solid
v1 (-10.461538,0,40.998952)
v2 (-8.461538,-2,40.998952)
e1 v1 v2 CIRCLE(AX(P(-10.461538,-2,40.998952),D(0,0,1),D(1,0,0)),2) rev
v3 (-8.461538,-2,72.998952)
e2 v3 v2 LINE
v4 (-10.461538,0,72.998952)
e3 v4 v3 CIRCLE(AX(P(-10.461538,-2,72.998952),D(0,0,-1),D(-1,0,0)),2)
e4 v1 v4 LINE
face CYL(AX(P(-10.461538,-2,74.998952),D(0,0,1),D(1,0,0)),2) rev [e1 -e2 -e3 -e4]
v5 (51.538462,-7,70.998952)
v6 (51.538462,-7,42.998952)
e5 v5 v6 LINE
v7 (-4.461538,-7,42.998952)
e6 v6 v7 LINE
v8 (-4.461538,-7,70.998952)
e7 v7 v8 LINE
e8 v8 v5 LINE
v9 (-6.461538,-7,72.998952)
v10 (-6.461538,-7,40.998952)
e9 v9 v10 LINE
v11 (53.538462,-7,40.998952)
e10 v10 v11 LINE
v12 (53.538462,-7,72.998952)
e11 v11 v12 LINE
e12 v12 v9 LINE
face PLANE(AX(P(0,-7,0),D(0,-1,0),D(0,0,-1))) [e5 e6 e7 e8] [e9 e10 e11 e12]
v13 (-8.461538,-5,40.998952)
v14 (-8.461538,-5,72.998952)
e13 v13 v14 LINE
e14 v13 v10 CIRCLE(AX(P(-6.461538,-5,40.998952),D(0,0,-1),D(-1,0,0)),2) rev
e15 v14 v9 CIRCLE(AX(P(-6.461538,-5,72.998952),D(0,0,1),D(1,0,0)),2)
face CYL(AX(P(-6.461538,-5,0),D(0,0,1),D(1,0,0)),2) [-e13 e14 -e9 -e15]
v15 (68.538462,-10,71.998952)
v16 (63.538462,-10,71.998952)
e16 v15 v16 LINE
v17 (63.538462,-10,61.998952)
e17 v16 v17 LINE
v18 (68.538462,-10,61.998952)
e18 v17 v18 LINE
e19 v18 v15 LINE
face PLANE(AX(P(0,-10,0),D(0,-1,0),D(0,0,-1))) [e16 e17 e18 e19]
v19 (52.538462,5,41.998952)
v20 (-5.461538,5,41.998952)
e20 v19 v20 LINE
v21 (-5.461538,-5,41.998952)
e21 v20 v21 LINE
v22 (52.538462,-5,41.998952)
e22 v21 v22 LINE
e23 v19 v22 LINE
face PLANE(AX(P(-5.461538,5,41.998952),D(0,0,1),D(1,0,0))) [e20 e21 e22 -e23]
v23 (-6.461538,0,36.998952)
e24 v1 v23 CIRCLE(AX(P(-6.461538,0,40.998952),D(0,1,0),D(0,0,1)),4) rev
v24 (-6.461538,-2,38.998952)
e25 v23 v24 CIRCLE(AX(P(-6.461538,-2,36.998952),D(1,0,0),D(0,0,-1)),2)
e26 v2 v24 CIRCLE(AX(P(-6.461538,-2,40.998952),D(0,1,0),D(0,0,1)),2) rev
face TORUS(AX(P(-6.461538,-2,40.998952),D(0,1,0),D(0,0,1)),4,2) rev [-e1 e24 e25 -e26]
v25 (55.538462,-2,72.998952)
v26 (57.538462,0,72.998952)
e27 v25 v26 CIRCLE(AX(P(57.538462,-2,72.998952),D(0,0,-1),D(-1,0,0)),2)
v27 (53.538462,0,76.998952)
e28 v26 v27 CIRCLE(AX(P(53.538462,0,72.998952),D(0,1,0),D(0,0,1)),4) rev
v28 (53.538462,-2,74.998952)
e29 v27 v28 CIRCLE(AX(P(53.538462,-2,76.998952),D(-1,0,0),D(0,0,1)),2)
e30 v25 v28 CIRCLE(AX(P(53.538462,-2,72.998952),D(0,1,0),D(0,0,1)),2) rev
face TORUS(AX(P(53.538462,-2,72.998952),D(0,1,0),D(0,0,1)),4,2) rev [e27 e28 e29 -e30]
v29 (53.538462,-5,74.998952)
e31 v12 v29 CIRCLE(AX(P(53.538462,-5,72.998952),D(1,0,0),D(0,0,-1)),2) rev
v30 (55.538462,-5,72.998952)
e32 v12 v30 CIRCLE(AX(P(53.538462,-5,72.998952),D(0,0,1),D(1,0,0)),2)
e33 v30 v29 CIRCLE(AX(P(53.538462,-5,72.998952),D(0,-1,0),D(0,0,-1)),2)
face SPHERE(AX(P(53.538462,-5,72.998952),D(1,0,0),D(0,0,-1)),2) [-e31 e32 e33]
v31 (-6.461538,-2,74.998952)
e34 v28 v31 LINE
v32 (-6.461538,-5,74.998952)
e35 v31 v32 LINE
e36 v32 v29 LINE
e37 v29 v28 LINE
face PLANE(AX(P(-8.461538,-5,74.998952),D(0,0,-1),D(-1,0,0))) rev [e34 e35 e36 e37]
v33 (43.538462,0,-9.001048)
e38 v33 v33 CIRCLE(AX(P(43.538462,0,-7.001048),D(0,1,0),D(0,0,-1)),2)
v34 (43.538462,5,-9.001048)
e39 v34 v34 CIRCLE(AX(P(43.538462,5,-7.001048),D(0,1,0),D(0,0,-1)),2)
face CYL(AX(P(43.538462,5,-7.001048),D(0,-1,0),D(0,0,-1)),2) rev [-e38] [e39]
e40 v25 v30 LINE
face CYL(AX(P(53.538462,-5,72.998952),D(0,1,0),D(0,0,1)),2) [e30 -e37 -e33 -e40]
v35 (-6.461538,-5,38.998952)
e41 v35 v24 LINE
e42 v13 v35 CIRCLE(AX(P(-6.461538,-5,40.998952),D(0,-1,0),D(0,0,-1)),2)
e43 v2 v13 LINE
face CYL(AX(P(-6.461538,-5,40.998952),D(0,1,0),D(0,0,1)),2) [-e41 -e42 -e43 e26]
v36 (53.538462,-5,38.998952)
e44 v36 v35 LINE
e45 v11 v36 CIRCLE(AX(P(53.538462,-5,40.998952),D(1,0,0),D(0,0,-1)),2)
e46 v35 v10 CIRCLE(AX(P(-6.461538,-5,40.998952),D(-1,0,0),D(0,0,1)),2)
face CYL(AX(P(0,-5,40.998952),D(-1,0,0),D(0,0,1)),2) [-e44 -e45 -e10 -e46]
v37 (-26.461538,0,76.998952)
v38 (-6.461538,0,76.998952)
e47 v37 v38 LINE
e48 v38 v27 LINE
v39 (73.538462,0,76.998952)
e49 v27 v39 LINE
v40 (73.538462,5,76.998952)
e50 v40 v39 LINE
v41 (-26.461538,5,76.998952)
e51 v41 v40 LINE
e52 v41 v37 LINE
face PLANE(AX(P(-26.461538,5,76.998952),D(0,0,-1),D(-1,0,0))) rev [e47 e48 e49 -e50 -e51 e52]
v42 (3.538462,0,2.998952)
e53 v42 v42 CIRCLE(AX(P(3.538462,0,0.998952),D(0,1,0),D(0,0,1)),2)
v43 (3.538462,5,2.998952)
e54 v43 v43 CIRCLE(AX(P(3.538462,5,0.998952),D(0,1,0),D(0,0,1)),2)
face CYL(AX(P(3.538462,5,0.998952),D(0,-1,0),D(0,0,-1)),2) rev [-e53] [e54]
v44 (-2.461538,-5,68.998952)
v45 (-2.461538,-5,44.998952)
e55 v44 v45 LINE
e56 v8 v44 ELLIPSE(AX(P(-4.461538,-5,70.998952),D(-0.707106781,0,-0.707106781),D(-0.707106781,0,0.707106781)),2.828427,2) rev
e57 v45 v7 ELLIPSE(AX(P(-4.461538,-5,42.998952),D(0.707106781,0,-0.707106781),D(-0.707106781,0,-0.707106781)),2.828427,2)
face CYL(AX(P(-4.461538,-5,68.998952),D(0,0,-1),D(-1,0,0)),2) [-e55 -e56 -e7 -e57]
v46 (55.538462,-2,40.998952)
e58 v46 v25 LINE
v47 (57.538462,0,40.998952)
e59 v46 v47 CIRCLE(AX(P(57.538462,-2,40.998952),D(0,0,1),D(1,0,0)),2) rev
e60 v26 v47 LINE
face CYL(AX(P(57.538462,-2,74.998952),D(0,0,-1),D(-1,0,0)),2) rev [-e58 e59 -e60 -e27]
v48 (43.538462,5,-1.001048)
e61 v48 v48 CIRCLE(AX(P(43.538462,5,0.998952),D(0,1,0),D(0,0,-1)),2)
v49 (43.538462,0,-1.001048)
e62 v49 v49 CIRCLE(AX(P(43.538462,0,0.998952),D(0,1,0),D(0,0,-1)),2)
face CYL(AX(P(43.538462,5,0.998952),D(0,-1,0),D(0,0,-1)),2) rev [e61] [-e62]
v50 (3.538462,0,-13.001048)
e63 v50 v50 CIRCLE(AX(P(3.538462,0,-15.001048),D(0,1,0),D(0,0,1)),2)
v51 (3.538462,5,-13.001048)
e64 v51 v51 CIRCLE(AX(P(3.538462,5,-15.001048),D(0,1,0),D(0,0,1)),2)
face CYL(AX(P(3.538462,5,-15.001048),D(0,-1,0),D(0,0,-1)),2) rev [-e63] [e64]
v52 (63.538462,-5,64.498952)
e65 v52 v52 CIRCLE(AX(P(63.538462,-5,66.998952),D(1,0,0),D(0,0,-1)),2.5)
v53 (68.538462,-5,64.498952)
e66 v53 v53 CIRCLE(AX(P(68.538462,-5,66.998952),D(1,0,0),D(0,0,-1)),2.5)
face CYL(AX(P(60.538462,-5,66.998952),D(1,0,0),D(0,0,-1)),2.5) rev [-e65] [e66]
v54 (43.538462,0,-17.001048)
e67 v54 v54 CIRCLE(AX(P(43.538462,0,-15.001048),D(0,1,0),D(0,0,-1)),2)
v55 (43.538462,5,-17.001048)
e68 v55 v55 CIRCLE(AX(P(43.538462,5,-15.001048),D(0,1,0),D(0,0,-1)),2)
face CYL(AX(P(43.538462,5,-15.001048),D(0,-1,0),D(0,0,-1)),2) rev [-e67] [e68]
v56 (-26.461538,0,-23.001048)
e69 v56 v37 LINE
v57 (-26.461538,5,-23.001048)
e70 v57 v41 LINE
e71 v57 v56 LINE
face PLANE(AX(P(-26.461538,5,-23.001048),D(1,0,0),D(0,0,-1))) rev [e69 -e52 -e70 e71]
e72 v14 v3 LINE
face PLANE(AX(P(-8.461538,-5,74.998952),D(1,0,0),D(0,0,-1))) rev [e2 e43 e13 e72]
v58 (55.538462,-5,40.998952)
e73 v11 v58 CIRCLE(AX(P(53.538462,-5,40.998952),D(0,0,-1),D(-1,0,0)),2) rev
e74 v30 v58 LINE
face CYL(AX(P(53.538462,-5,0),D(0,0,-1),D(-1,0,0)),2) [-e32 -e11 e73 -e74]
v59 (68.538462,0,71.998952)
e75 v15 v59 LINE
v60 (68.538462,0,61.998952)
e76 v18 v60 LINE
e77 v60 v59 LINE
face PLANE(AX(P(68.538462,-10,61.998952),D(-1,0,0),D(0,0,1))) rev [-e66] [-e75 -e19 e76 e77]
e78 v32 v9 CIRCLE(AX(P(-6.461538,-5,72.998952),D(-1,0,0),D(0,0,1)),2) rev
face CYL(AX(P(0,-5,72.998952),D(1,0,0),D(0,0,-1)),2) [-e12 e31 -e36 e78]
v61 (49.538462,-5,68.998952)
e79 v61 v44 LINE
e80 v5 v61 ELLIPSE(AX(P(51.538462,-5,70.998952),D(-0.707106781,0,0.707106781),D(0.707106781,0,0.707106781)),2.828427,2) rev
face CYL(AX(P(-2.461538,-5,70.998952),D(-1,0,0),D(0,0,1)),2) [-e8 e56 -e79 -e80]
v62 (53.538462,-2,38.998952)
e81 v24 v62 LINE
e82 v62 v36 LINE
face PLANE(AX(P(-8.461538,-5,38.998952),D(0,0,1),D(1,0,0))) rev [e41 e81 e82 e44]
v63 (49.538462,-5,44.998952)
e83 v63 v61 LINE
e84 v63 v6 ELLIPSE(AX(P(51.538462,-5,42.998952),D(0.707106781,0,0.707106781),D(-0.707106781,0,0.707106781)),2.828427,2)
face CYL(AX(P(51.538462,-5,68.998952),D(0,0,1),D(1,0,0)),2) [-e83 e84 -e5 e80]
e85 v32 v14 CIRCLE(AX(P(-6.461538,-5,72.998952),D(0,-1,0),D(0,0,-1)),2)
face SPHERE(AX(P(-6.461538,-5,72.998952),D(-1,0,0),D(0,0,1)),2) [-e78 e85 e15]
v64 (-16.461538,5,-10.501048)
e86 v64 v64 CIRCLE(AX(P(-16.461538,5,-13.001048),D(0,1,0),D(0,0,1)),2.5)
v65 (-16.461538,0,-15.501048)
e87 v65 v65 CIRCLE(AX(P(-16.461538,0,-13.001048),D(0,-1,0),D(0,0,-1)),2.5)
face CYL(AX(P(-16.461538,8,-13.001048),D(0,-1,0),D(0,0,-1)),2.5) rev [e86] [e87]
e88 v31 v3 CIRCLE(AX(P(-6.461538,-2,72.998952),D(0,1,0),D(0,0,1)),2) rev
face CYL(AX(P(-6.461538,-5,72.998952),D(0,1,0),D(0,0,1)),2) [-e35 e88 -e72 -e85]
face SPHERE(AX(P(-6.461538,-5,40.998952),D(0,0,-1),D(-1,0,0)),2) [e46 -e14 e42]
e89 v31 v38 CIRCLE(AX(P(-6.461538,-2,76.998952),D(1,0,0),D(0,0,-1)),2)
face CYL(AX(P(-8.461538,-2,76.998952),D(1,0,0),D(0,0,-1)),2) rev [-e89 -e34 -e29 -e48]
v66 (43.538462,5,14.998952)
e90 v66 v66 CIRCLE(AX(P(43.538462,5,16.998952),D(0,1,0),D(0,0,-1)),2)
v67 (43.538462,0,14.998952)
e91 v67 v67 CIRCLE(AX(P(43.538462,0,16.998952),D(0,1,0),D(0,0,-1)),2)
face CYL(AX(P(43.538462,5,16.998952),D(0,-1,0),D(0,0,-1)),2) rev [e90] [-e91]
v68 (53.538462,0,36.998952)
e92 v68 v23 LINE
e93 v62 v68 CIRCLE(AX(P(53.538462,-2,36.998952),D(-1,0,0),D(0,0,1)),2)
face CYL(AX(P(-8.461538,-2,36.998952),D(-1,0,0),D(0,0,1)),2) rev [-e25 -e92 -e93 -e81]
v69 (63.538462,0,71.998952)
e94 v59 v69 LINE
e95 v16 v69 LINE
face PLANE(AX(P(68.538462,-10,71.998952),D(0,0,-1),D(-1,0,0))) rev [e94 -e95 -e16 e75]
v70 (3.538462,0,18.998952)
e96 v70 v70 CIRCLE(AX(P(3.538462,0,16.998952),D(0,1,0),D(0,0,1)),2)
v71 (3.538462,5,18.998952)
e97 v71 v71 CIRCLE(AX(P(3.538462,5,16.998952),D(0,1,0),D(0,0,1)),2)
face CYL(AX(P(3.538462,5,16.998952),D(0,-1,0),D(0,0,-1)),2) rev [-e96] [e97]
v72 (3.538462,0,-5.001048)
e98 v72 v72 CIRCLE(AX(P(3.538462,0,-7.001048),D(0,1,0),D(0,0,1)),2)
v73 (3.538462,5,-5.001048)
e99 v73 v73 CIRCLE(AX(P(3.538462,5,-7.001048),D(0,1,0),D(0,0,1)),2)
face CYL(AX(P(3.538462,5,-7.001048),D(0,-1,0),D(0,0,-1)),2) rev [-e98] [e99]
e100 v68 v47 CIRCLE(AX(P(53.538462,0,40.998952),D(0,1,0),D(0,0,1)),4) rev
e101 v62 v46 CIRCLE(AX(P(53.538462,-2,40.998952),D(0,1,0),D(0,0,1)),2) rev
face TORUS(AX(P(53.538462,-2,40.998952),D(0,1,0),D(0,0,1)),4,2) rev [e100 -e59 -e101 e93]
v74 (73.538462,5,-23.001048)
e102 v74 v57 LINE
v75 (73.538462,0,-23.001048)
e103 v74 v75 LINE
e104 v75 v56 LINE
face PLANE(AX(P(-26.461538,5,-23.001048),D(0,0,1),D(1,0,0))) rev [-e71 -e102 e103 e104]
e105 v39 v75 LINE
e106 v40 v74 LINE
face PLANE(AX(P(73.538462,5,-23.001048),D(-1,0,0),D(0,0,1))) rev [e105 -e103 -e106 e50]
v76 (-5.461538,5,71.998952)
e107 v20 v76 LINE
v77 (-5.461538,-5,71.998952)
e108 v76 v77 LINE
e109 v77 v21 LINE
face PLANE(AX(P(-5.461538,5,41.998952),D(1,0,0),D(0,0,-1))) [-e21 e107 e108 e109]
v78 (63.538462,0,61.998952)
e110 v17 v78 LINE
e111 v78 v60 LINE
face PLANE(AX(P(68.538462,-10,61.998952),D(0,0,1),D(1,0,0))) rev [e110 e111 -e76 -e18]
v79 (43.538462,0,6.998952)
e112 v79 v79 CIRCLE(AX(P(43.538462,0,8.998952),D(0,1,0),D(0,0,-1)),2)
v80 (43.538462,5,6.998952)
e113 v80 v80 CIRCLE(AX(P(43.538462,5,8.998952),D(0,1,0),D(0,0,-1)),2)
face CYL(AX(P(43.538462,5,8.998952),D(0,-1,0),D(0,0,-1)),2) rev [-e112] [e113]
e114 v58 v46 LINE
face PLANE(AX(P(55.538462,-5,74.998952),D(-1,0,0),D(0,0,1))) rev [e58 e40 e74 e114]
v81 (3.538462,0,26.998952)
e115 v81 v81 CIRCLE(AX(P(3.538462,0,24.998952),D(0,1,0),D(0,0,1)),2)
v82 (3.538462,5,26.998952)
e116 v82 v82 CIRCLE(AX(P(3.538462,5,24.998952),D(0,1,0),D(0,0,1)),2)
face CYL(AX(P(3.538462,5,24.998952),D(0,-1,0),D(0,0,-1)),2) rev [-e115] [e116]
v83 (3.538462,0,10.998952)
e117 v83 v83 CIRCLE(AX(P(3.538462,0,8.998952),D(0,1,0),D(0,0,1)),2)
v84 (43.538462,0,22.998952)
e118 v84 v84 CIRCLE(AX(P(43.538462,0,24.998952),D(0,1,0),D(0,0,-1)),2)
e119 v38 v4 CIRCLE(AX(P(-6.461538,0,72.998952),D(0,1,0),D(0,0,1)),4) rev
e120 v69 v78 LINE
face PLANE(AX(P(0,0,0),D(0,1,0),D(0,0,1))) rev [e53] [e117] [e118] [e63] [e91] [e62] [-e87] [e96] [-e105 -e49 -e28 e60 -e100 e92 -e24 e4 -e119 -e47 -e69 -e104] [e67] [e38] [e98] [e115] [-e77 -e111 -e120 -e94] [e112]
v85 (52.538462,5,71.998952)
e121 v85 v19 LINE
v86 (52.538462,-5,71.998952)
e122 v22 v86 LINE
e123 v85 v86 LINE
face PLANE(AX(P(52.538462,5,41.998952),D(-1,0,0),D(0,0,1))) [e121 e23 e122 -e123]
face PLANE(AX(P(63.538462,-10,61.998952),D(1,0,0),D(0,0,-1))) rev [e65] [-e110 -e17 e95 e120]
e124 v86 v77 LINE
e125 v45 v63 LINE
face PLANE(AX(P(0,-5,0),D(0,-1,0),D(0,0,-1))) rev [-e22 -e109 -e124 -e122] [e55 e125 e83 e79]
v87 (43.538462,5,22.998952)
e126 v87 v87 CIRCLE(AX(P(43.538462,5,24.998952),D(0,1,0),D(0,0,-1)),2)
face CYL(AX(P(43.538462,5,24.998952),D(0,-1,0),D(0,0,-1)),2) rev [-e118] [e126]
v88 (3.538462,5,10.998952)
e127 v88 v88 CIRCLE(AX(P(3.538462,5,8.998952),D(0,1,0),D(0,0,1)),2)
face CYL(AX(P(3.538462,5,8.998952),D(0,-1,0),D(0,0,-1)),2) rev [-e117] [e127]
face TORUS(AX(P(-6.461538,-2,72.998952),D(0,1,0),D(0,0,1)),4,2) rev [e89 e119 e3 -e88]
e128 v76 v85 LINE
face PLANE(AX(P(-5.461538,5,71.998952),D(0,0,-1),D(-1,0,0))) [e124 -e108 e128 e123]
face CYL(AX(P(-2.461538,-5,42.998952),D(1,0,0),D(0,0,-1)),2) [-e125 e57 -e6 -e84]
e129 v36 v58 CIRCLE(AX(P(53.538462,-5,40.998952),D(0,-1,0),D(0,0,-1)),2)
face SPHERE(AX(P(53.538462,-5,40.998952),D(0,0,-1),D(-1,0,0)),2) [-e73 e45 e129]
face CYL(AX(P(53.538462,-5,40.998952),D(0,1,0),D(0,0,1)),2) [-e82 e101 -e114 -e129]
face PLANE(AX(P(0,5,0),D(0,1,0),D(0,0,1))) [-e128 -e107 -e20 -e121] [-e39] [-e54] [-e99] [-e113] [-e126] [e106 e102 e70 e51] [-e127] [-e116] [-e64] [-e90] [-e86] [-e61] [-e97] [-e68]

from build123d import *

# Parameters (mm, degrees)
SKETCH1_W           = 100
SKETCH1_H           = 100
SKETCH1_R           = 2
SKETCH1_W_2         = 58
SKETCH1_H_2         = 30
BOSS_EXTRUDE1_DEPTH = 5
SKETCH2_W           = 64
SKETCH2_H           = 36
SKETCH2_W_2         = 58
SKETCH2_H_2         = 30
BOSS_EXTRUDE2_DEPTH = 5
SKETCH3_W           = 64
SKETCH3_H           = 36
SKETCH3_W_2         = 52
SKETCH3_H_2         = 24
BOSS_EXTRUDE3_DEPTH = 2
FILLET2_R           = 2
SKETCH5_W           = 5
SKETCH5_H           = 10
BOSS_EXTRUDE4_DEPTH = 10
SKETCH6_R           = 2.5
CUT_EXTRUDE2_DEPTH  = 8
SKETCH7_R           = 2.5
CUT_EXTRUDE3_DEPTH  = 8


with BuildPart() as part:
    # Sketch1 → Boss-Extrude1 (new body)
    with BuildSketch(Plane(origin=(0, 0, 0), x_dir=(1, 0, 0), z_dir=(0, 1, 0))):
        with Locations((23.538461538, -26.998952175)):
            Rectangle(SKETCH1_W, SKETCH1_H)
        with Locations(Location((3.538461538, 15.001047825, 0), (0, 0, 270))):
            Circle(SKETCH1_R, mode=Mode.SUBTRACT)
        with Locations(Location((3.538461538, 7.001047825, 0), (0, 0, 270))):
            Circle(SKETCH1_R, mode=Mode.SUBTRACT)
        with Locations(Location((3.538461538, -0.998952175, 0), (0, 0, 270))):
            Circle(SKETCH1_R, mode=Mode.SUBTRACT)
        with Locations(Location((3.538461538, -8.998952175, 0), (0, 0, 270))):
            Circle(SKETCH1_R, mode=Mode.SUBTRACT)
        with Locations(Location((3.538461538, -16.998952175, 0), (0, 0, 270))):
            Circle(SKETCH1_R, mode=Mode.SUBTRACT)
        with Locations(Location((3.538461538, -24.998952175, 0), (0, 0, 270))):
            Circle(SKETCH1_R, mode=Mode.SUBTRACT)
        with Locations(Location((43.538461538, -24.998952175, 0), (0, 0, 90))):
            Circle(SKETCH1_R, mode=Mode.SUBTRACT)
        with Locations(Location((43.538461538, -16.998952175, 0), (0, 0, 90))):
            Circle(SKETCH1_R, mode=Mode.SUBTRACT)
        with Locations(Location((43.538461538, -8.998952175, 0), (0, 0, 90))):
            Circle(SKETCH1_R, mode=Mode.SUBTRACT)
        with Locations(Location((43.538461538, -0.998952175, 0), (0, 0, 90))):
            Circle(SKETCH1_R, mode=Mode.SUBTRACT)
        with Locations(Location((43.538461538, 7.001047825, 0), (0, 0, 90))):
            Circle(SKETCH1_R, mode=Mode.SUBTRACT)
        with Locations(Location((43.538461538, 15.001047825, 0), (0, 0, 90))):
            Circle(SKETCH1_R, mode=Mode.SUBTRACT)
        with Locations((23.538461538, -56.998952175)):
            Rectangle(SKETCH1_W_2, SKETCH1_H_2, mode=Mode.SUBTRACT)
    extrude(amount=BOSS_EXTRUDE1_DEPTH)

    # Sketch2 → Boss-Extrude2 (add)
    with BuildSketch(Plane.XZ):
        with Locations((23.538461538, 56.998952175)):
            Rectangle(SKETCH2_W, SKETCH2_H)
        with Locations((23.538461538, 56.998952175)):
            Rectangle(SKETCH2_W_2, SKETCH2_H_2, mode=Mode.SUBTRACT)
    extrude(amount=BOSS_EXTRUDE2_DEPTH)

    # Sketch3 → Boss-Extrude3 (add)
    with BuildSketch(Plane.XZ.offset(5)):
        with Locations((23.538461538, 56.998952175)):
            Rectangle(SKETCH3_W, SKETCH3_H)
        with Locations((23.538461538, 56.998952175)):
            Rectangle(SKETCH3_W_2, SKETCH3_H_2, mode=Mode.SUBTRACT)
    extrude(amount=BOSS_EXTRUDE3_DEPTH)

    # Fillet2
    fillet2_edges = [part.edges().sort_by_distance(p)[0] for p in [
        (49.538461538, -7, 56.998952175),
        (23.538461538, -7, 68.998952175),
        (-2.461538462, -7, 56.998952175),
        (23.538461538, -7, 44.998952175),
        (23.538461538, -7, 74.998952175),
        (55.538461538, -7, 56.998952175),
        (23.538461538, -7, 38.998952175),
        (-8.461538462, -7, 56.998952175),
        (-8.461538462, -3.5, 38.998952175),
        (55.538461538, -3.5, 38.998952175),
        (55.538461538, -3.5, 74.998952175),
        (-8.461538462, -3.5, 74.998952175),
        (-8.461538462, 0, 56.998952175),
        (23.538461538, 0, 74.998952175),
        (55.538461538, 0, 56.998952175),
        (23.538461538, 0, 38.998952175),
    ]]
    fillet(fillet2_edges, radius=FILLET2_R - 0.0001)  # a hair under: the kernel refuses the full size

    # Sketch5 → Boss-Extrude4 (add)
    with BuildSketch(Plane.XZ):
        with Locations((66.038461538, 66.998952175)):
            Rectangle(SKETCH5_W, SKETCH5_H)
    extrude(amount=BOSS_EXTRUDE4_DEPTH)

    # Sketch6 → Cut-Extrude2 (cut)
    with BuildSketch(Plane(origin=(68.538461538, 0, 0), x_dir=(0, 0, -1), z_dir=(1, 0, 0))):
        with Locations((-66.998952175, -5)):
            Circle(SKETCH6_R)
    extrude(amount=-CUT_EXTRUDE2_DEPTH, mode=Mode.SUBTRACT)

    # Sketch7 → Cut-Extrude3 (cut)
    with BuildSketch(Plane.XZ):
        with Locations(Location((-16.461538462, -13.001047825, 0), (0, 0, 270))):
            Circle(SKETCH7_R)
    extrude(amount=-CUT_EXTRUDE3_DEPTH, mode=Mode.SUBTRACT)


solid = part.part
